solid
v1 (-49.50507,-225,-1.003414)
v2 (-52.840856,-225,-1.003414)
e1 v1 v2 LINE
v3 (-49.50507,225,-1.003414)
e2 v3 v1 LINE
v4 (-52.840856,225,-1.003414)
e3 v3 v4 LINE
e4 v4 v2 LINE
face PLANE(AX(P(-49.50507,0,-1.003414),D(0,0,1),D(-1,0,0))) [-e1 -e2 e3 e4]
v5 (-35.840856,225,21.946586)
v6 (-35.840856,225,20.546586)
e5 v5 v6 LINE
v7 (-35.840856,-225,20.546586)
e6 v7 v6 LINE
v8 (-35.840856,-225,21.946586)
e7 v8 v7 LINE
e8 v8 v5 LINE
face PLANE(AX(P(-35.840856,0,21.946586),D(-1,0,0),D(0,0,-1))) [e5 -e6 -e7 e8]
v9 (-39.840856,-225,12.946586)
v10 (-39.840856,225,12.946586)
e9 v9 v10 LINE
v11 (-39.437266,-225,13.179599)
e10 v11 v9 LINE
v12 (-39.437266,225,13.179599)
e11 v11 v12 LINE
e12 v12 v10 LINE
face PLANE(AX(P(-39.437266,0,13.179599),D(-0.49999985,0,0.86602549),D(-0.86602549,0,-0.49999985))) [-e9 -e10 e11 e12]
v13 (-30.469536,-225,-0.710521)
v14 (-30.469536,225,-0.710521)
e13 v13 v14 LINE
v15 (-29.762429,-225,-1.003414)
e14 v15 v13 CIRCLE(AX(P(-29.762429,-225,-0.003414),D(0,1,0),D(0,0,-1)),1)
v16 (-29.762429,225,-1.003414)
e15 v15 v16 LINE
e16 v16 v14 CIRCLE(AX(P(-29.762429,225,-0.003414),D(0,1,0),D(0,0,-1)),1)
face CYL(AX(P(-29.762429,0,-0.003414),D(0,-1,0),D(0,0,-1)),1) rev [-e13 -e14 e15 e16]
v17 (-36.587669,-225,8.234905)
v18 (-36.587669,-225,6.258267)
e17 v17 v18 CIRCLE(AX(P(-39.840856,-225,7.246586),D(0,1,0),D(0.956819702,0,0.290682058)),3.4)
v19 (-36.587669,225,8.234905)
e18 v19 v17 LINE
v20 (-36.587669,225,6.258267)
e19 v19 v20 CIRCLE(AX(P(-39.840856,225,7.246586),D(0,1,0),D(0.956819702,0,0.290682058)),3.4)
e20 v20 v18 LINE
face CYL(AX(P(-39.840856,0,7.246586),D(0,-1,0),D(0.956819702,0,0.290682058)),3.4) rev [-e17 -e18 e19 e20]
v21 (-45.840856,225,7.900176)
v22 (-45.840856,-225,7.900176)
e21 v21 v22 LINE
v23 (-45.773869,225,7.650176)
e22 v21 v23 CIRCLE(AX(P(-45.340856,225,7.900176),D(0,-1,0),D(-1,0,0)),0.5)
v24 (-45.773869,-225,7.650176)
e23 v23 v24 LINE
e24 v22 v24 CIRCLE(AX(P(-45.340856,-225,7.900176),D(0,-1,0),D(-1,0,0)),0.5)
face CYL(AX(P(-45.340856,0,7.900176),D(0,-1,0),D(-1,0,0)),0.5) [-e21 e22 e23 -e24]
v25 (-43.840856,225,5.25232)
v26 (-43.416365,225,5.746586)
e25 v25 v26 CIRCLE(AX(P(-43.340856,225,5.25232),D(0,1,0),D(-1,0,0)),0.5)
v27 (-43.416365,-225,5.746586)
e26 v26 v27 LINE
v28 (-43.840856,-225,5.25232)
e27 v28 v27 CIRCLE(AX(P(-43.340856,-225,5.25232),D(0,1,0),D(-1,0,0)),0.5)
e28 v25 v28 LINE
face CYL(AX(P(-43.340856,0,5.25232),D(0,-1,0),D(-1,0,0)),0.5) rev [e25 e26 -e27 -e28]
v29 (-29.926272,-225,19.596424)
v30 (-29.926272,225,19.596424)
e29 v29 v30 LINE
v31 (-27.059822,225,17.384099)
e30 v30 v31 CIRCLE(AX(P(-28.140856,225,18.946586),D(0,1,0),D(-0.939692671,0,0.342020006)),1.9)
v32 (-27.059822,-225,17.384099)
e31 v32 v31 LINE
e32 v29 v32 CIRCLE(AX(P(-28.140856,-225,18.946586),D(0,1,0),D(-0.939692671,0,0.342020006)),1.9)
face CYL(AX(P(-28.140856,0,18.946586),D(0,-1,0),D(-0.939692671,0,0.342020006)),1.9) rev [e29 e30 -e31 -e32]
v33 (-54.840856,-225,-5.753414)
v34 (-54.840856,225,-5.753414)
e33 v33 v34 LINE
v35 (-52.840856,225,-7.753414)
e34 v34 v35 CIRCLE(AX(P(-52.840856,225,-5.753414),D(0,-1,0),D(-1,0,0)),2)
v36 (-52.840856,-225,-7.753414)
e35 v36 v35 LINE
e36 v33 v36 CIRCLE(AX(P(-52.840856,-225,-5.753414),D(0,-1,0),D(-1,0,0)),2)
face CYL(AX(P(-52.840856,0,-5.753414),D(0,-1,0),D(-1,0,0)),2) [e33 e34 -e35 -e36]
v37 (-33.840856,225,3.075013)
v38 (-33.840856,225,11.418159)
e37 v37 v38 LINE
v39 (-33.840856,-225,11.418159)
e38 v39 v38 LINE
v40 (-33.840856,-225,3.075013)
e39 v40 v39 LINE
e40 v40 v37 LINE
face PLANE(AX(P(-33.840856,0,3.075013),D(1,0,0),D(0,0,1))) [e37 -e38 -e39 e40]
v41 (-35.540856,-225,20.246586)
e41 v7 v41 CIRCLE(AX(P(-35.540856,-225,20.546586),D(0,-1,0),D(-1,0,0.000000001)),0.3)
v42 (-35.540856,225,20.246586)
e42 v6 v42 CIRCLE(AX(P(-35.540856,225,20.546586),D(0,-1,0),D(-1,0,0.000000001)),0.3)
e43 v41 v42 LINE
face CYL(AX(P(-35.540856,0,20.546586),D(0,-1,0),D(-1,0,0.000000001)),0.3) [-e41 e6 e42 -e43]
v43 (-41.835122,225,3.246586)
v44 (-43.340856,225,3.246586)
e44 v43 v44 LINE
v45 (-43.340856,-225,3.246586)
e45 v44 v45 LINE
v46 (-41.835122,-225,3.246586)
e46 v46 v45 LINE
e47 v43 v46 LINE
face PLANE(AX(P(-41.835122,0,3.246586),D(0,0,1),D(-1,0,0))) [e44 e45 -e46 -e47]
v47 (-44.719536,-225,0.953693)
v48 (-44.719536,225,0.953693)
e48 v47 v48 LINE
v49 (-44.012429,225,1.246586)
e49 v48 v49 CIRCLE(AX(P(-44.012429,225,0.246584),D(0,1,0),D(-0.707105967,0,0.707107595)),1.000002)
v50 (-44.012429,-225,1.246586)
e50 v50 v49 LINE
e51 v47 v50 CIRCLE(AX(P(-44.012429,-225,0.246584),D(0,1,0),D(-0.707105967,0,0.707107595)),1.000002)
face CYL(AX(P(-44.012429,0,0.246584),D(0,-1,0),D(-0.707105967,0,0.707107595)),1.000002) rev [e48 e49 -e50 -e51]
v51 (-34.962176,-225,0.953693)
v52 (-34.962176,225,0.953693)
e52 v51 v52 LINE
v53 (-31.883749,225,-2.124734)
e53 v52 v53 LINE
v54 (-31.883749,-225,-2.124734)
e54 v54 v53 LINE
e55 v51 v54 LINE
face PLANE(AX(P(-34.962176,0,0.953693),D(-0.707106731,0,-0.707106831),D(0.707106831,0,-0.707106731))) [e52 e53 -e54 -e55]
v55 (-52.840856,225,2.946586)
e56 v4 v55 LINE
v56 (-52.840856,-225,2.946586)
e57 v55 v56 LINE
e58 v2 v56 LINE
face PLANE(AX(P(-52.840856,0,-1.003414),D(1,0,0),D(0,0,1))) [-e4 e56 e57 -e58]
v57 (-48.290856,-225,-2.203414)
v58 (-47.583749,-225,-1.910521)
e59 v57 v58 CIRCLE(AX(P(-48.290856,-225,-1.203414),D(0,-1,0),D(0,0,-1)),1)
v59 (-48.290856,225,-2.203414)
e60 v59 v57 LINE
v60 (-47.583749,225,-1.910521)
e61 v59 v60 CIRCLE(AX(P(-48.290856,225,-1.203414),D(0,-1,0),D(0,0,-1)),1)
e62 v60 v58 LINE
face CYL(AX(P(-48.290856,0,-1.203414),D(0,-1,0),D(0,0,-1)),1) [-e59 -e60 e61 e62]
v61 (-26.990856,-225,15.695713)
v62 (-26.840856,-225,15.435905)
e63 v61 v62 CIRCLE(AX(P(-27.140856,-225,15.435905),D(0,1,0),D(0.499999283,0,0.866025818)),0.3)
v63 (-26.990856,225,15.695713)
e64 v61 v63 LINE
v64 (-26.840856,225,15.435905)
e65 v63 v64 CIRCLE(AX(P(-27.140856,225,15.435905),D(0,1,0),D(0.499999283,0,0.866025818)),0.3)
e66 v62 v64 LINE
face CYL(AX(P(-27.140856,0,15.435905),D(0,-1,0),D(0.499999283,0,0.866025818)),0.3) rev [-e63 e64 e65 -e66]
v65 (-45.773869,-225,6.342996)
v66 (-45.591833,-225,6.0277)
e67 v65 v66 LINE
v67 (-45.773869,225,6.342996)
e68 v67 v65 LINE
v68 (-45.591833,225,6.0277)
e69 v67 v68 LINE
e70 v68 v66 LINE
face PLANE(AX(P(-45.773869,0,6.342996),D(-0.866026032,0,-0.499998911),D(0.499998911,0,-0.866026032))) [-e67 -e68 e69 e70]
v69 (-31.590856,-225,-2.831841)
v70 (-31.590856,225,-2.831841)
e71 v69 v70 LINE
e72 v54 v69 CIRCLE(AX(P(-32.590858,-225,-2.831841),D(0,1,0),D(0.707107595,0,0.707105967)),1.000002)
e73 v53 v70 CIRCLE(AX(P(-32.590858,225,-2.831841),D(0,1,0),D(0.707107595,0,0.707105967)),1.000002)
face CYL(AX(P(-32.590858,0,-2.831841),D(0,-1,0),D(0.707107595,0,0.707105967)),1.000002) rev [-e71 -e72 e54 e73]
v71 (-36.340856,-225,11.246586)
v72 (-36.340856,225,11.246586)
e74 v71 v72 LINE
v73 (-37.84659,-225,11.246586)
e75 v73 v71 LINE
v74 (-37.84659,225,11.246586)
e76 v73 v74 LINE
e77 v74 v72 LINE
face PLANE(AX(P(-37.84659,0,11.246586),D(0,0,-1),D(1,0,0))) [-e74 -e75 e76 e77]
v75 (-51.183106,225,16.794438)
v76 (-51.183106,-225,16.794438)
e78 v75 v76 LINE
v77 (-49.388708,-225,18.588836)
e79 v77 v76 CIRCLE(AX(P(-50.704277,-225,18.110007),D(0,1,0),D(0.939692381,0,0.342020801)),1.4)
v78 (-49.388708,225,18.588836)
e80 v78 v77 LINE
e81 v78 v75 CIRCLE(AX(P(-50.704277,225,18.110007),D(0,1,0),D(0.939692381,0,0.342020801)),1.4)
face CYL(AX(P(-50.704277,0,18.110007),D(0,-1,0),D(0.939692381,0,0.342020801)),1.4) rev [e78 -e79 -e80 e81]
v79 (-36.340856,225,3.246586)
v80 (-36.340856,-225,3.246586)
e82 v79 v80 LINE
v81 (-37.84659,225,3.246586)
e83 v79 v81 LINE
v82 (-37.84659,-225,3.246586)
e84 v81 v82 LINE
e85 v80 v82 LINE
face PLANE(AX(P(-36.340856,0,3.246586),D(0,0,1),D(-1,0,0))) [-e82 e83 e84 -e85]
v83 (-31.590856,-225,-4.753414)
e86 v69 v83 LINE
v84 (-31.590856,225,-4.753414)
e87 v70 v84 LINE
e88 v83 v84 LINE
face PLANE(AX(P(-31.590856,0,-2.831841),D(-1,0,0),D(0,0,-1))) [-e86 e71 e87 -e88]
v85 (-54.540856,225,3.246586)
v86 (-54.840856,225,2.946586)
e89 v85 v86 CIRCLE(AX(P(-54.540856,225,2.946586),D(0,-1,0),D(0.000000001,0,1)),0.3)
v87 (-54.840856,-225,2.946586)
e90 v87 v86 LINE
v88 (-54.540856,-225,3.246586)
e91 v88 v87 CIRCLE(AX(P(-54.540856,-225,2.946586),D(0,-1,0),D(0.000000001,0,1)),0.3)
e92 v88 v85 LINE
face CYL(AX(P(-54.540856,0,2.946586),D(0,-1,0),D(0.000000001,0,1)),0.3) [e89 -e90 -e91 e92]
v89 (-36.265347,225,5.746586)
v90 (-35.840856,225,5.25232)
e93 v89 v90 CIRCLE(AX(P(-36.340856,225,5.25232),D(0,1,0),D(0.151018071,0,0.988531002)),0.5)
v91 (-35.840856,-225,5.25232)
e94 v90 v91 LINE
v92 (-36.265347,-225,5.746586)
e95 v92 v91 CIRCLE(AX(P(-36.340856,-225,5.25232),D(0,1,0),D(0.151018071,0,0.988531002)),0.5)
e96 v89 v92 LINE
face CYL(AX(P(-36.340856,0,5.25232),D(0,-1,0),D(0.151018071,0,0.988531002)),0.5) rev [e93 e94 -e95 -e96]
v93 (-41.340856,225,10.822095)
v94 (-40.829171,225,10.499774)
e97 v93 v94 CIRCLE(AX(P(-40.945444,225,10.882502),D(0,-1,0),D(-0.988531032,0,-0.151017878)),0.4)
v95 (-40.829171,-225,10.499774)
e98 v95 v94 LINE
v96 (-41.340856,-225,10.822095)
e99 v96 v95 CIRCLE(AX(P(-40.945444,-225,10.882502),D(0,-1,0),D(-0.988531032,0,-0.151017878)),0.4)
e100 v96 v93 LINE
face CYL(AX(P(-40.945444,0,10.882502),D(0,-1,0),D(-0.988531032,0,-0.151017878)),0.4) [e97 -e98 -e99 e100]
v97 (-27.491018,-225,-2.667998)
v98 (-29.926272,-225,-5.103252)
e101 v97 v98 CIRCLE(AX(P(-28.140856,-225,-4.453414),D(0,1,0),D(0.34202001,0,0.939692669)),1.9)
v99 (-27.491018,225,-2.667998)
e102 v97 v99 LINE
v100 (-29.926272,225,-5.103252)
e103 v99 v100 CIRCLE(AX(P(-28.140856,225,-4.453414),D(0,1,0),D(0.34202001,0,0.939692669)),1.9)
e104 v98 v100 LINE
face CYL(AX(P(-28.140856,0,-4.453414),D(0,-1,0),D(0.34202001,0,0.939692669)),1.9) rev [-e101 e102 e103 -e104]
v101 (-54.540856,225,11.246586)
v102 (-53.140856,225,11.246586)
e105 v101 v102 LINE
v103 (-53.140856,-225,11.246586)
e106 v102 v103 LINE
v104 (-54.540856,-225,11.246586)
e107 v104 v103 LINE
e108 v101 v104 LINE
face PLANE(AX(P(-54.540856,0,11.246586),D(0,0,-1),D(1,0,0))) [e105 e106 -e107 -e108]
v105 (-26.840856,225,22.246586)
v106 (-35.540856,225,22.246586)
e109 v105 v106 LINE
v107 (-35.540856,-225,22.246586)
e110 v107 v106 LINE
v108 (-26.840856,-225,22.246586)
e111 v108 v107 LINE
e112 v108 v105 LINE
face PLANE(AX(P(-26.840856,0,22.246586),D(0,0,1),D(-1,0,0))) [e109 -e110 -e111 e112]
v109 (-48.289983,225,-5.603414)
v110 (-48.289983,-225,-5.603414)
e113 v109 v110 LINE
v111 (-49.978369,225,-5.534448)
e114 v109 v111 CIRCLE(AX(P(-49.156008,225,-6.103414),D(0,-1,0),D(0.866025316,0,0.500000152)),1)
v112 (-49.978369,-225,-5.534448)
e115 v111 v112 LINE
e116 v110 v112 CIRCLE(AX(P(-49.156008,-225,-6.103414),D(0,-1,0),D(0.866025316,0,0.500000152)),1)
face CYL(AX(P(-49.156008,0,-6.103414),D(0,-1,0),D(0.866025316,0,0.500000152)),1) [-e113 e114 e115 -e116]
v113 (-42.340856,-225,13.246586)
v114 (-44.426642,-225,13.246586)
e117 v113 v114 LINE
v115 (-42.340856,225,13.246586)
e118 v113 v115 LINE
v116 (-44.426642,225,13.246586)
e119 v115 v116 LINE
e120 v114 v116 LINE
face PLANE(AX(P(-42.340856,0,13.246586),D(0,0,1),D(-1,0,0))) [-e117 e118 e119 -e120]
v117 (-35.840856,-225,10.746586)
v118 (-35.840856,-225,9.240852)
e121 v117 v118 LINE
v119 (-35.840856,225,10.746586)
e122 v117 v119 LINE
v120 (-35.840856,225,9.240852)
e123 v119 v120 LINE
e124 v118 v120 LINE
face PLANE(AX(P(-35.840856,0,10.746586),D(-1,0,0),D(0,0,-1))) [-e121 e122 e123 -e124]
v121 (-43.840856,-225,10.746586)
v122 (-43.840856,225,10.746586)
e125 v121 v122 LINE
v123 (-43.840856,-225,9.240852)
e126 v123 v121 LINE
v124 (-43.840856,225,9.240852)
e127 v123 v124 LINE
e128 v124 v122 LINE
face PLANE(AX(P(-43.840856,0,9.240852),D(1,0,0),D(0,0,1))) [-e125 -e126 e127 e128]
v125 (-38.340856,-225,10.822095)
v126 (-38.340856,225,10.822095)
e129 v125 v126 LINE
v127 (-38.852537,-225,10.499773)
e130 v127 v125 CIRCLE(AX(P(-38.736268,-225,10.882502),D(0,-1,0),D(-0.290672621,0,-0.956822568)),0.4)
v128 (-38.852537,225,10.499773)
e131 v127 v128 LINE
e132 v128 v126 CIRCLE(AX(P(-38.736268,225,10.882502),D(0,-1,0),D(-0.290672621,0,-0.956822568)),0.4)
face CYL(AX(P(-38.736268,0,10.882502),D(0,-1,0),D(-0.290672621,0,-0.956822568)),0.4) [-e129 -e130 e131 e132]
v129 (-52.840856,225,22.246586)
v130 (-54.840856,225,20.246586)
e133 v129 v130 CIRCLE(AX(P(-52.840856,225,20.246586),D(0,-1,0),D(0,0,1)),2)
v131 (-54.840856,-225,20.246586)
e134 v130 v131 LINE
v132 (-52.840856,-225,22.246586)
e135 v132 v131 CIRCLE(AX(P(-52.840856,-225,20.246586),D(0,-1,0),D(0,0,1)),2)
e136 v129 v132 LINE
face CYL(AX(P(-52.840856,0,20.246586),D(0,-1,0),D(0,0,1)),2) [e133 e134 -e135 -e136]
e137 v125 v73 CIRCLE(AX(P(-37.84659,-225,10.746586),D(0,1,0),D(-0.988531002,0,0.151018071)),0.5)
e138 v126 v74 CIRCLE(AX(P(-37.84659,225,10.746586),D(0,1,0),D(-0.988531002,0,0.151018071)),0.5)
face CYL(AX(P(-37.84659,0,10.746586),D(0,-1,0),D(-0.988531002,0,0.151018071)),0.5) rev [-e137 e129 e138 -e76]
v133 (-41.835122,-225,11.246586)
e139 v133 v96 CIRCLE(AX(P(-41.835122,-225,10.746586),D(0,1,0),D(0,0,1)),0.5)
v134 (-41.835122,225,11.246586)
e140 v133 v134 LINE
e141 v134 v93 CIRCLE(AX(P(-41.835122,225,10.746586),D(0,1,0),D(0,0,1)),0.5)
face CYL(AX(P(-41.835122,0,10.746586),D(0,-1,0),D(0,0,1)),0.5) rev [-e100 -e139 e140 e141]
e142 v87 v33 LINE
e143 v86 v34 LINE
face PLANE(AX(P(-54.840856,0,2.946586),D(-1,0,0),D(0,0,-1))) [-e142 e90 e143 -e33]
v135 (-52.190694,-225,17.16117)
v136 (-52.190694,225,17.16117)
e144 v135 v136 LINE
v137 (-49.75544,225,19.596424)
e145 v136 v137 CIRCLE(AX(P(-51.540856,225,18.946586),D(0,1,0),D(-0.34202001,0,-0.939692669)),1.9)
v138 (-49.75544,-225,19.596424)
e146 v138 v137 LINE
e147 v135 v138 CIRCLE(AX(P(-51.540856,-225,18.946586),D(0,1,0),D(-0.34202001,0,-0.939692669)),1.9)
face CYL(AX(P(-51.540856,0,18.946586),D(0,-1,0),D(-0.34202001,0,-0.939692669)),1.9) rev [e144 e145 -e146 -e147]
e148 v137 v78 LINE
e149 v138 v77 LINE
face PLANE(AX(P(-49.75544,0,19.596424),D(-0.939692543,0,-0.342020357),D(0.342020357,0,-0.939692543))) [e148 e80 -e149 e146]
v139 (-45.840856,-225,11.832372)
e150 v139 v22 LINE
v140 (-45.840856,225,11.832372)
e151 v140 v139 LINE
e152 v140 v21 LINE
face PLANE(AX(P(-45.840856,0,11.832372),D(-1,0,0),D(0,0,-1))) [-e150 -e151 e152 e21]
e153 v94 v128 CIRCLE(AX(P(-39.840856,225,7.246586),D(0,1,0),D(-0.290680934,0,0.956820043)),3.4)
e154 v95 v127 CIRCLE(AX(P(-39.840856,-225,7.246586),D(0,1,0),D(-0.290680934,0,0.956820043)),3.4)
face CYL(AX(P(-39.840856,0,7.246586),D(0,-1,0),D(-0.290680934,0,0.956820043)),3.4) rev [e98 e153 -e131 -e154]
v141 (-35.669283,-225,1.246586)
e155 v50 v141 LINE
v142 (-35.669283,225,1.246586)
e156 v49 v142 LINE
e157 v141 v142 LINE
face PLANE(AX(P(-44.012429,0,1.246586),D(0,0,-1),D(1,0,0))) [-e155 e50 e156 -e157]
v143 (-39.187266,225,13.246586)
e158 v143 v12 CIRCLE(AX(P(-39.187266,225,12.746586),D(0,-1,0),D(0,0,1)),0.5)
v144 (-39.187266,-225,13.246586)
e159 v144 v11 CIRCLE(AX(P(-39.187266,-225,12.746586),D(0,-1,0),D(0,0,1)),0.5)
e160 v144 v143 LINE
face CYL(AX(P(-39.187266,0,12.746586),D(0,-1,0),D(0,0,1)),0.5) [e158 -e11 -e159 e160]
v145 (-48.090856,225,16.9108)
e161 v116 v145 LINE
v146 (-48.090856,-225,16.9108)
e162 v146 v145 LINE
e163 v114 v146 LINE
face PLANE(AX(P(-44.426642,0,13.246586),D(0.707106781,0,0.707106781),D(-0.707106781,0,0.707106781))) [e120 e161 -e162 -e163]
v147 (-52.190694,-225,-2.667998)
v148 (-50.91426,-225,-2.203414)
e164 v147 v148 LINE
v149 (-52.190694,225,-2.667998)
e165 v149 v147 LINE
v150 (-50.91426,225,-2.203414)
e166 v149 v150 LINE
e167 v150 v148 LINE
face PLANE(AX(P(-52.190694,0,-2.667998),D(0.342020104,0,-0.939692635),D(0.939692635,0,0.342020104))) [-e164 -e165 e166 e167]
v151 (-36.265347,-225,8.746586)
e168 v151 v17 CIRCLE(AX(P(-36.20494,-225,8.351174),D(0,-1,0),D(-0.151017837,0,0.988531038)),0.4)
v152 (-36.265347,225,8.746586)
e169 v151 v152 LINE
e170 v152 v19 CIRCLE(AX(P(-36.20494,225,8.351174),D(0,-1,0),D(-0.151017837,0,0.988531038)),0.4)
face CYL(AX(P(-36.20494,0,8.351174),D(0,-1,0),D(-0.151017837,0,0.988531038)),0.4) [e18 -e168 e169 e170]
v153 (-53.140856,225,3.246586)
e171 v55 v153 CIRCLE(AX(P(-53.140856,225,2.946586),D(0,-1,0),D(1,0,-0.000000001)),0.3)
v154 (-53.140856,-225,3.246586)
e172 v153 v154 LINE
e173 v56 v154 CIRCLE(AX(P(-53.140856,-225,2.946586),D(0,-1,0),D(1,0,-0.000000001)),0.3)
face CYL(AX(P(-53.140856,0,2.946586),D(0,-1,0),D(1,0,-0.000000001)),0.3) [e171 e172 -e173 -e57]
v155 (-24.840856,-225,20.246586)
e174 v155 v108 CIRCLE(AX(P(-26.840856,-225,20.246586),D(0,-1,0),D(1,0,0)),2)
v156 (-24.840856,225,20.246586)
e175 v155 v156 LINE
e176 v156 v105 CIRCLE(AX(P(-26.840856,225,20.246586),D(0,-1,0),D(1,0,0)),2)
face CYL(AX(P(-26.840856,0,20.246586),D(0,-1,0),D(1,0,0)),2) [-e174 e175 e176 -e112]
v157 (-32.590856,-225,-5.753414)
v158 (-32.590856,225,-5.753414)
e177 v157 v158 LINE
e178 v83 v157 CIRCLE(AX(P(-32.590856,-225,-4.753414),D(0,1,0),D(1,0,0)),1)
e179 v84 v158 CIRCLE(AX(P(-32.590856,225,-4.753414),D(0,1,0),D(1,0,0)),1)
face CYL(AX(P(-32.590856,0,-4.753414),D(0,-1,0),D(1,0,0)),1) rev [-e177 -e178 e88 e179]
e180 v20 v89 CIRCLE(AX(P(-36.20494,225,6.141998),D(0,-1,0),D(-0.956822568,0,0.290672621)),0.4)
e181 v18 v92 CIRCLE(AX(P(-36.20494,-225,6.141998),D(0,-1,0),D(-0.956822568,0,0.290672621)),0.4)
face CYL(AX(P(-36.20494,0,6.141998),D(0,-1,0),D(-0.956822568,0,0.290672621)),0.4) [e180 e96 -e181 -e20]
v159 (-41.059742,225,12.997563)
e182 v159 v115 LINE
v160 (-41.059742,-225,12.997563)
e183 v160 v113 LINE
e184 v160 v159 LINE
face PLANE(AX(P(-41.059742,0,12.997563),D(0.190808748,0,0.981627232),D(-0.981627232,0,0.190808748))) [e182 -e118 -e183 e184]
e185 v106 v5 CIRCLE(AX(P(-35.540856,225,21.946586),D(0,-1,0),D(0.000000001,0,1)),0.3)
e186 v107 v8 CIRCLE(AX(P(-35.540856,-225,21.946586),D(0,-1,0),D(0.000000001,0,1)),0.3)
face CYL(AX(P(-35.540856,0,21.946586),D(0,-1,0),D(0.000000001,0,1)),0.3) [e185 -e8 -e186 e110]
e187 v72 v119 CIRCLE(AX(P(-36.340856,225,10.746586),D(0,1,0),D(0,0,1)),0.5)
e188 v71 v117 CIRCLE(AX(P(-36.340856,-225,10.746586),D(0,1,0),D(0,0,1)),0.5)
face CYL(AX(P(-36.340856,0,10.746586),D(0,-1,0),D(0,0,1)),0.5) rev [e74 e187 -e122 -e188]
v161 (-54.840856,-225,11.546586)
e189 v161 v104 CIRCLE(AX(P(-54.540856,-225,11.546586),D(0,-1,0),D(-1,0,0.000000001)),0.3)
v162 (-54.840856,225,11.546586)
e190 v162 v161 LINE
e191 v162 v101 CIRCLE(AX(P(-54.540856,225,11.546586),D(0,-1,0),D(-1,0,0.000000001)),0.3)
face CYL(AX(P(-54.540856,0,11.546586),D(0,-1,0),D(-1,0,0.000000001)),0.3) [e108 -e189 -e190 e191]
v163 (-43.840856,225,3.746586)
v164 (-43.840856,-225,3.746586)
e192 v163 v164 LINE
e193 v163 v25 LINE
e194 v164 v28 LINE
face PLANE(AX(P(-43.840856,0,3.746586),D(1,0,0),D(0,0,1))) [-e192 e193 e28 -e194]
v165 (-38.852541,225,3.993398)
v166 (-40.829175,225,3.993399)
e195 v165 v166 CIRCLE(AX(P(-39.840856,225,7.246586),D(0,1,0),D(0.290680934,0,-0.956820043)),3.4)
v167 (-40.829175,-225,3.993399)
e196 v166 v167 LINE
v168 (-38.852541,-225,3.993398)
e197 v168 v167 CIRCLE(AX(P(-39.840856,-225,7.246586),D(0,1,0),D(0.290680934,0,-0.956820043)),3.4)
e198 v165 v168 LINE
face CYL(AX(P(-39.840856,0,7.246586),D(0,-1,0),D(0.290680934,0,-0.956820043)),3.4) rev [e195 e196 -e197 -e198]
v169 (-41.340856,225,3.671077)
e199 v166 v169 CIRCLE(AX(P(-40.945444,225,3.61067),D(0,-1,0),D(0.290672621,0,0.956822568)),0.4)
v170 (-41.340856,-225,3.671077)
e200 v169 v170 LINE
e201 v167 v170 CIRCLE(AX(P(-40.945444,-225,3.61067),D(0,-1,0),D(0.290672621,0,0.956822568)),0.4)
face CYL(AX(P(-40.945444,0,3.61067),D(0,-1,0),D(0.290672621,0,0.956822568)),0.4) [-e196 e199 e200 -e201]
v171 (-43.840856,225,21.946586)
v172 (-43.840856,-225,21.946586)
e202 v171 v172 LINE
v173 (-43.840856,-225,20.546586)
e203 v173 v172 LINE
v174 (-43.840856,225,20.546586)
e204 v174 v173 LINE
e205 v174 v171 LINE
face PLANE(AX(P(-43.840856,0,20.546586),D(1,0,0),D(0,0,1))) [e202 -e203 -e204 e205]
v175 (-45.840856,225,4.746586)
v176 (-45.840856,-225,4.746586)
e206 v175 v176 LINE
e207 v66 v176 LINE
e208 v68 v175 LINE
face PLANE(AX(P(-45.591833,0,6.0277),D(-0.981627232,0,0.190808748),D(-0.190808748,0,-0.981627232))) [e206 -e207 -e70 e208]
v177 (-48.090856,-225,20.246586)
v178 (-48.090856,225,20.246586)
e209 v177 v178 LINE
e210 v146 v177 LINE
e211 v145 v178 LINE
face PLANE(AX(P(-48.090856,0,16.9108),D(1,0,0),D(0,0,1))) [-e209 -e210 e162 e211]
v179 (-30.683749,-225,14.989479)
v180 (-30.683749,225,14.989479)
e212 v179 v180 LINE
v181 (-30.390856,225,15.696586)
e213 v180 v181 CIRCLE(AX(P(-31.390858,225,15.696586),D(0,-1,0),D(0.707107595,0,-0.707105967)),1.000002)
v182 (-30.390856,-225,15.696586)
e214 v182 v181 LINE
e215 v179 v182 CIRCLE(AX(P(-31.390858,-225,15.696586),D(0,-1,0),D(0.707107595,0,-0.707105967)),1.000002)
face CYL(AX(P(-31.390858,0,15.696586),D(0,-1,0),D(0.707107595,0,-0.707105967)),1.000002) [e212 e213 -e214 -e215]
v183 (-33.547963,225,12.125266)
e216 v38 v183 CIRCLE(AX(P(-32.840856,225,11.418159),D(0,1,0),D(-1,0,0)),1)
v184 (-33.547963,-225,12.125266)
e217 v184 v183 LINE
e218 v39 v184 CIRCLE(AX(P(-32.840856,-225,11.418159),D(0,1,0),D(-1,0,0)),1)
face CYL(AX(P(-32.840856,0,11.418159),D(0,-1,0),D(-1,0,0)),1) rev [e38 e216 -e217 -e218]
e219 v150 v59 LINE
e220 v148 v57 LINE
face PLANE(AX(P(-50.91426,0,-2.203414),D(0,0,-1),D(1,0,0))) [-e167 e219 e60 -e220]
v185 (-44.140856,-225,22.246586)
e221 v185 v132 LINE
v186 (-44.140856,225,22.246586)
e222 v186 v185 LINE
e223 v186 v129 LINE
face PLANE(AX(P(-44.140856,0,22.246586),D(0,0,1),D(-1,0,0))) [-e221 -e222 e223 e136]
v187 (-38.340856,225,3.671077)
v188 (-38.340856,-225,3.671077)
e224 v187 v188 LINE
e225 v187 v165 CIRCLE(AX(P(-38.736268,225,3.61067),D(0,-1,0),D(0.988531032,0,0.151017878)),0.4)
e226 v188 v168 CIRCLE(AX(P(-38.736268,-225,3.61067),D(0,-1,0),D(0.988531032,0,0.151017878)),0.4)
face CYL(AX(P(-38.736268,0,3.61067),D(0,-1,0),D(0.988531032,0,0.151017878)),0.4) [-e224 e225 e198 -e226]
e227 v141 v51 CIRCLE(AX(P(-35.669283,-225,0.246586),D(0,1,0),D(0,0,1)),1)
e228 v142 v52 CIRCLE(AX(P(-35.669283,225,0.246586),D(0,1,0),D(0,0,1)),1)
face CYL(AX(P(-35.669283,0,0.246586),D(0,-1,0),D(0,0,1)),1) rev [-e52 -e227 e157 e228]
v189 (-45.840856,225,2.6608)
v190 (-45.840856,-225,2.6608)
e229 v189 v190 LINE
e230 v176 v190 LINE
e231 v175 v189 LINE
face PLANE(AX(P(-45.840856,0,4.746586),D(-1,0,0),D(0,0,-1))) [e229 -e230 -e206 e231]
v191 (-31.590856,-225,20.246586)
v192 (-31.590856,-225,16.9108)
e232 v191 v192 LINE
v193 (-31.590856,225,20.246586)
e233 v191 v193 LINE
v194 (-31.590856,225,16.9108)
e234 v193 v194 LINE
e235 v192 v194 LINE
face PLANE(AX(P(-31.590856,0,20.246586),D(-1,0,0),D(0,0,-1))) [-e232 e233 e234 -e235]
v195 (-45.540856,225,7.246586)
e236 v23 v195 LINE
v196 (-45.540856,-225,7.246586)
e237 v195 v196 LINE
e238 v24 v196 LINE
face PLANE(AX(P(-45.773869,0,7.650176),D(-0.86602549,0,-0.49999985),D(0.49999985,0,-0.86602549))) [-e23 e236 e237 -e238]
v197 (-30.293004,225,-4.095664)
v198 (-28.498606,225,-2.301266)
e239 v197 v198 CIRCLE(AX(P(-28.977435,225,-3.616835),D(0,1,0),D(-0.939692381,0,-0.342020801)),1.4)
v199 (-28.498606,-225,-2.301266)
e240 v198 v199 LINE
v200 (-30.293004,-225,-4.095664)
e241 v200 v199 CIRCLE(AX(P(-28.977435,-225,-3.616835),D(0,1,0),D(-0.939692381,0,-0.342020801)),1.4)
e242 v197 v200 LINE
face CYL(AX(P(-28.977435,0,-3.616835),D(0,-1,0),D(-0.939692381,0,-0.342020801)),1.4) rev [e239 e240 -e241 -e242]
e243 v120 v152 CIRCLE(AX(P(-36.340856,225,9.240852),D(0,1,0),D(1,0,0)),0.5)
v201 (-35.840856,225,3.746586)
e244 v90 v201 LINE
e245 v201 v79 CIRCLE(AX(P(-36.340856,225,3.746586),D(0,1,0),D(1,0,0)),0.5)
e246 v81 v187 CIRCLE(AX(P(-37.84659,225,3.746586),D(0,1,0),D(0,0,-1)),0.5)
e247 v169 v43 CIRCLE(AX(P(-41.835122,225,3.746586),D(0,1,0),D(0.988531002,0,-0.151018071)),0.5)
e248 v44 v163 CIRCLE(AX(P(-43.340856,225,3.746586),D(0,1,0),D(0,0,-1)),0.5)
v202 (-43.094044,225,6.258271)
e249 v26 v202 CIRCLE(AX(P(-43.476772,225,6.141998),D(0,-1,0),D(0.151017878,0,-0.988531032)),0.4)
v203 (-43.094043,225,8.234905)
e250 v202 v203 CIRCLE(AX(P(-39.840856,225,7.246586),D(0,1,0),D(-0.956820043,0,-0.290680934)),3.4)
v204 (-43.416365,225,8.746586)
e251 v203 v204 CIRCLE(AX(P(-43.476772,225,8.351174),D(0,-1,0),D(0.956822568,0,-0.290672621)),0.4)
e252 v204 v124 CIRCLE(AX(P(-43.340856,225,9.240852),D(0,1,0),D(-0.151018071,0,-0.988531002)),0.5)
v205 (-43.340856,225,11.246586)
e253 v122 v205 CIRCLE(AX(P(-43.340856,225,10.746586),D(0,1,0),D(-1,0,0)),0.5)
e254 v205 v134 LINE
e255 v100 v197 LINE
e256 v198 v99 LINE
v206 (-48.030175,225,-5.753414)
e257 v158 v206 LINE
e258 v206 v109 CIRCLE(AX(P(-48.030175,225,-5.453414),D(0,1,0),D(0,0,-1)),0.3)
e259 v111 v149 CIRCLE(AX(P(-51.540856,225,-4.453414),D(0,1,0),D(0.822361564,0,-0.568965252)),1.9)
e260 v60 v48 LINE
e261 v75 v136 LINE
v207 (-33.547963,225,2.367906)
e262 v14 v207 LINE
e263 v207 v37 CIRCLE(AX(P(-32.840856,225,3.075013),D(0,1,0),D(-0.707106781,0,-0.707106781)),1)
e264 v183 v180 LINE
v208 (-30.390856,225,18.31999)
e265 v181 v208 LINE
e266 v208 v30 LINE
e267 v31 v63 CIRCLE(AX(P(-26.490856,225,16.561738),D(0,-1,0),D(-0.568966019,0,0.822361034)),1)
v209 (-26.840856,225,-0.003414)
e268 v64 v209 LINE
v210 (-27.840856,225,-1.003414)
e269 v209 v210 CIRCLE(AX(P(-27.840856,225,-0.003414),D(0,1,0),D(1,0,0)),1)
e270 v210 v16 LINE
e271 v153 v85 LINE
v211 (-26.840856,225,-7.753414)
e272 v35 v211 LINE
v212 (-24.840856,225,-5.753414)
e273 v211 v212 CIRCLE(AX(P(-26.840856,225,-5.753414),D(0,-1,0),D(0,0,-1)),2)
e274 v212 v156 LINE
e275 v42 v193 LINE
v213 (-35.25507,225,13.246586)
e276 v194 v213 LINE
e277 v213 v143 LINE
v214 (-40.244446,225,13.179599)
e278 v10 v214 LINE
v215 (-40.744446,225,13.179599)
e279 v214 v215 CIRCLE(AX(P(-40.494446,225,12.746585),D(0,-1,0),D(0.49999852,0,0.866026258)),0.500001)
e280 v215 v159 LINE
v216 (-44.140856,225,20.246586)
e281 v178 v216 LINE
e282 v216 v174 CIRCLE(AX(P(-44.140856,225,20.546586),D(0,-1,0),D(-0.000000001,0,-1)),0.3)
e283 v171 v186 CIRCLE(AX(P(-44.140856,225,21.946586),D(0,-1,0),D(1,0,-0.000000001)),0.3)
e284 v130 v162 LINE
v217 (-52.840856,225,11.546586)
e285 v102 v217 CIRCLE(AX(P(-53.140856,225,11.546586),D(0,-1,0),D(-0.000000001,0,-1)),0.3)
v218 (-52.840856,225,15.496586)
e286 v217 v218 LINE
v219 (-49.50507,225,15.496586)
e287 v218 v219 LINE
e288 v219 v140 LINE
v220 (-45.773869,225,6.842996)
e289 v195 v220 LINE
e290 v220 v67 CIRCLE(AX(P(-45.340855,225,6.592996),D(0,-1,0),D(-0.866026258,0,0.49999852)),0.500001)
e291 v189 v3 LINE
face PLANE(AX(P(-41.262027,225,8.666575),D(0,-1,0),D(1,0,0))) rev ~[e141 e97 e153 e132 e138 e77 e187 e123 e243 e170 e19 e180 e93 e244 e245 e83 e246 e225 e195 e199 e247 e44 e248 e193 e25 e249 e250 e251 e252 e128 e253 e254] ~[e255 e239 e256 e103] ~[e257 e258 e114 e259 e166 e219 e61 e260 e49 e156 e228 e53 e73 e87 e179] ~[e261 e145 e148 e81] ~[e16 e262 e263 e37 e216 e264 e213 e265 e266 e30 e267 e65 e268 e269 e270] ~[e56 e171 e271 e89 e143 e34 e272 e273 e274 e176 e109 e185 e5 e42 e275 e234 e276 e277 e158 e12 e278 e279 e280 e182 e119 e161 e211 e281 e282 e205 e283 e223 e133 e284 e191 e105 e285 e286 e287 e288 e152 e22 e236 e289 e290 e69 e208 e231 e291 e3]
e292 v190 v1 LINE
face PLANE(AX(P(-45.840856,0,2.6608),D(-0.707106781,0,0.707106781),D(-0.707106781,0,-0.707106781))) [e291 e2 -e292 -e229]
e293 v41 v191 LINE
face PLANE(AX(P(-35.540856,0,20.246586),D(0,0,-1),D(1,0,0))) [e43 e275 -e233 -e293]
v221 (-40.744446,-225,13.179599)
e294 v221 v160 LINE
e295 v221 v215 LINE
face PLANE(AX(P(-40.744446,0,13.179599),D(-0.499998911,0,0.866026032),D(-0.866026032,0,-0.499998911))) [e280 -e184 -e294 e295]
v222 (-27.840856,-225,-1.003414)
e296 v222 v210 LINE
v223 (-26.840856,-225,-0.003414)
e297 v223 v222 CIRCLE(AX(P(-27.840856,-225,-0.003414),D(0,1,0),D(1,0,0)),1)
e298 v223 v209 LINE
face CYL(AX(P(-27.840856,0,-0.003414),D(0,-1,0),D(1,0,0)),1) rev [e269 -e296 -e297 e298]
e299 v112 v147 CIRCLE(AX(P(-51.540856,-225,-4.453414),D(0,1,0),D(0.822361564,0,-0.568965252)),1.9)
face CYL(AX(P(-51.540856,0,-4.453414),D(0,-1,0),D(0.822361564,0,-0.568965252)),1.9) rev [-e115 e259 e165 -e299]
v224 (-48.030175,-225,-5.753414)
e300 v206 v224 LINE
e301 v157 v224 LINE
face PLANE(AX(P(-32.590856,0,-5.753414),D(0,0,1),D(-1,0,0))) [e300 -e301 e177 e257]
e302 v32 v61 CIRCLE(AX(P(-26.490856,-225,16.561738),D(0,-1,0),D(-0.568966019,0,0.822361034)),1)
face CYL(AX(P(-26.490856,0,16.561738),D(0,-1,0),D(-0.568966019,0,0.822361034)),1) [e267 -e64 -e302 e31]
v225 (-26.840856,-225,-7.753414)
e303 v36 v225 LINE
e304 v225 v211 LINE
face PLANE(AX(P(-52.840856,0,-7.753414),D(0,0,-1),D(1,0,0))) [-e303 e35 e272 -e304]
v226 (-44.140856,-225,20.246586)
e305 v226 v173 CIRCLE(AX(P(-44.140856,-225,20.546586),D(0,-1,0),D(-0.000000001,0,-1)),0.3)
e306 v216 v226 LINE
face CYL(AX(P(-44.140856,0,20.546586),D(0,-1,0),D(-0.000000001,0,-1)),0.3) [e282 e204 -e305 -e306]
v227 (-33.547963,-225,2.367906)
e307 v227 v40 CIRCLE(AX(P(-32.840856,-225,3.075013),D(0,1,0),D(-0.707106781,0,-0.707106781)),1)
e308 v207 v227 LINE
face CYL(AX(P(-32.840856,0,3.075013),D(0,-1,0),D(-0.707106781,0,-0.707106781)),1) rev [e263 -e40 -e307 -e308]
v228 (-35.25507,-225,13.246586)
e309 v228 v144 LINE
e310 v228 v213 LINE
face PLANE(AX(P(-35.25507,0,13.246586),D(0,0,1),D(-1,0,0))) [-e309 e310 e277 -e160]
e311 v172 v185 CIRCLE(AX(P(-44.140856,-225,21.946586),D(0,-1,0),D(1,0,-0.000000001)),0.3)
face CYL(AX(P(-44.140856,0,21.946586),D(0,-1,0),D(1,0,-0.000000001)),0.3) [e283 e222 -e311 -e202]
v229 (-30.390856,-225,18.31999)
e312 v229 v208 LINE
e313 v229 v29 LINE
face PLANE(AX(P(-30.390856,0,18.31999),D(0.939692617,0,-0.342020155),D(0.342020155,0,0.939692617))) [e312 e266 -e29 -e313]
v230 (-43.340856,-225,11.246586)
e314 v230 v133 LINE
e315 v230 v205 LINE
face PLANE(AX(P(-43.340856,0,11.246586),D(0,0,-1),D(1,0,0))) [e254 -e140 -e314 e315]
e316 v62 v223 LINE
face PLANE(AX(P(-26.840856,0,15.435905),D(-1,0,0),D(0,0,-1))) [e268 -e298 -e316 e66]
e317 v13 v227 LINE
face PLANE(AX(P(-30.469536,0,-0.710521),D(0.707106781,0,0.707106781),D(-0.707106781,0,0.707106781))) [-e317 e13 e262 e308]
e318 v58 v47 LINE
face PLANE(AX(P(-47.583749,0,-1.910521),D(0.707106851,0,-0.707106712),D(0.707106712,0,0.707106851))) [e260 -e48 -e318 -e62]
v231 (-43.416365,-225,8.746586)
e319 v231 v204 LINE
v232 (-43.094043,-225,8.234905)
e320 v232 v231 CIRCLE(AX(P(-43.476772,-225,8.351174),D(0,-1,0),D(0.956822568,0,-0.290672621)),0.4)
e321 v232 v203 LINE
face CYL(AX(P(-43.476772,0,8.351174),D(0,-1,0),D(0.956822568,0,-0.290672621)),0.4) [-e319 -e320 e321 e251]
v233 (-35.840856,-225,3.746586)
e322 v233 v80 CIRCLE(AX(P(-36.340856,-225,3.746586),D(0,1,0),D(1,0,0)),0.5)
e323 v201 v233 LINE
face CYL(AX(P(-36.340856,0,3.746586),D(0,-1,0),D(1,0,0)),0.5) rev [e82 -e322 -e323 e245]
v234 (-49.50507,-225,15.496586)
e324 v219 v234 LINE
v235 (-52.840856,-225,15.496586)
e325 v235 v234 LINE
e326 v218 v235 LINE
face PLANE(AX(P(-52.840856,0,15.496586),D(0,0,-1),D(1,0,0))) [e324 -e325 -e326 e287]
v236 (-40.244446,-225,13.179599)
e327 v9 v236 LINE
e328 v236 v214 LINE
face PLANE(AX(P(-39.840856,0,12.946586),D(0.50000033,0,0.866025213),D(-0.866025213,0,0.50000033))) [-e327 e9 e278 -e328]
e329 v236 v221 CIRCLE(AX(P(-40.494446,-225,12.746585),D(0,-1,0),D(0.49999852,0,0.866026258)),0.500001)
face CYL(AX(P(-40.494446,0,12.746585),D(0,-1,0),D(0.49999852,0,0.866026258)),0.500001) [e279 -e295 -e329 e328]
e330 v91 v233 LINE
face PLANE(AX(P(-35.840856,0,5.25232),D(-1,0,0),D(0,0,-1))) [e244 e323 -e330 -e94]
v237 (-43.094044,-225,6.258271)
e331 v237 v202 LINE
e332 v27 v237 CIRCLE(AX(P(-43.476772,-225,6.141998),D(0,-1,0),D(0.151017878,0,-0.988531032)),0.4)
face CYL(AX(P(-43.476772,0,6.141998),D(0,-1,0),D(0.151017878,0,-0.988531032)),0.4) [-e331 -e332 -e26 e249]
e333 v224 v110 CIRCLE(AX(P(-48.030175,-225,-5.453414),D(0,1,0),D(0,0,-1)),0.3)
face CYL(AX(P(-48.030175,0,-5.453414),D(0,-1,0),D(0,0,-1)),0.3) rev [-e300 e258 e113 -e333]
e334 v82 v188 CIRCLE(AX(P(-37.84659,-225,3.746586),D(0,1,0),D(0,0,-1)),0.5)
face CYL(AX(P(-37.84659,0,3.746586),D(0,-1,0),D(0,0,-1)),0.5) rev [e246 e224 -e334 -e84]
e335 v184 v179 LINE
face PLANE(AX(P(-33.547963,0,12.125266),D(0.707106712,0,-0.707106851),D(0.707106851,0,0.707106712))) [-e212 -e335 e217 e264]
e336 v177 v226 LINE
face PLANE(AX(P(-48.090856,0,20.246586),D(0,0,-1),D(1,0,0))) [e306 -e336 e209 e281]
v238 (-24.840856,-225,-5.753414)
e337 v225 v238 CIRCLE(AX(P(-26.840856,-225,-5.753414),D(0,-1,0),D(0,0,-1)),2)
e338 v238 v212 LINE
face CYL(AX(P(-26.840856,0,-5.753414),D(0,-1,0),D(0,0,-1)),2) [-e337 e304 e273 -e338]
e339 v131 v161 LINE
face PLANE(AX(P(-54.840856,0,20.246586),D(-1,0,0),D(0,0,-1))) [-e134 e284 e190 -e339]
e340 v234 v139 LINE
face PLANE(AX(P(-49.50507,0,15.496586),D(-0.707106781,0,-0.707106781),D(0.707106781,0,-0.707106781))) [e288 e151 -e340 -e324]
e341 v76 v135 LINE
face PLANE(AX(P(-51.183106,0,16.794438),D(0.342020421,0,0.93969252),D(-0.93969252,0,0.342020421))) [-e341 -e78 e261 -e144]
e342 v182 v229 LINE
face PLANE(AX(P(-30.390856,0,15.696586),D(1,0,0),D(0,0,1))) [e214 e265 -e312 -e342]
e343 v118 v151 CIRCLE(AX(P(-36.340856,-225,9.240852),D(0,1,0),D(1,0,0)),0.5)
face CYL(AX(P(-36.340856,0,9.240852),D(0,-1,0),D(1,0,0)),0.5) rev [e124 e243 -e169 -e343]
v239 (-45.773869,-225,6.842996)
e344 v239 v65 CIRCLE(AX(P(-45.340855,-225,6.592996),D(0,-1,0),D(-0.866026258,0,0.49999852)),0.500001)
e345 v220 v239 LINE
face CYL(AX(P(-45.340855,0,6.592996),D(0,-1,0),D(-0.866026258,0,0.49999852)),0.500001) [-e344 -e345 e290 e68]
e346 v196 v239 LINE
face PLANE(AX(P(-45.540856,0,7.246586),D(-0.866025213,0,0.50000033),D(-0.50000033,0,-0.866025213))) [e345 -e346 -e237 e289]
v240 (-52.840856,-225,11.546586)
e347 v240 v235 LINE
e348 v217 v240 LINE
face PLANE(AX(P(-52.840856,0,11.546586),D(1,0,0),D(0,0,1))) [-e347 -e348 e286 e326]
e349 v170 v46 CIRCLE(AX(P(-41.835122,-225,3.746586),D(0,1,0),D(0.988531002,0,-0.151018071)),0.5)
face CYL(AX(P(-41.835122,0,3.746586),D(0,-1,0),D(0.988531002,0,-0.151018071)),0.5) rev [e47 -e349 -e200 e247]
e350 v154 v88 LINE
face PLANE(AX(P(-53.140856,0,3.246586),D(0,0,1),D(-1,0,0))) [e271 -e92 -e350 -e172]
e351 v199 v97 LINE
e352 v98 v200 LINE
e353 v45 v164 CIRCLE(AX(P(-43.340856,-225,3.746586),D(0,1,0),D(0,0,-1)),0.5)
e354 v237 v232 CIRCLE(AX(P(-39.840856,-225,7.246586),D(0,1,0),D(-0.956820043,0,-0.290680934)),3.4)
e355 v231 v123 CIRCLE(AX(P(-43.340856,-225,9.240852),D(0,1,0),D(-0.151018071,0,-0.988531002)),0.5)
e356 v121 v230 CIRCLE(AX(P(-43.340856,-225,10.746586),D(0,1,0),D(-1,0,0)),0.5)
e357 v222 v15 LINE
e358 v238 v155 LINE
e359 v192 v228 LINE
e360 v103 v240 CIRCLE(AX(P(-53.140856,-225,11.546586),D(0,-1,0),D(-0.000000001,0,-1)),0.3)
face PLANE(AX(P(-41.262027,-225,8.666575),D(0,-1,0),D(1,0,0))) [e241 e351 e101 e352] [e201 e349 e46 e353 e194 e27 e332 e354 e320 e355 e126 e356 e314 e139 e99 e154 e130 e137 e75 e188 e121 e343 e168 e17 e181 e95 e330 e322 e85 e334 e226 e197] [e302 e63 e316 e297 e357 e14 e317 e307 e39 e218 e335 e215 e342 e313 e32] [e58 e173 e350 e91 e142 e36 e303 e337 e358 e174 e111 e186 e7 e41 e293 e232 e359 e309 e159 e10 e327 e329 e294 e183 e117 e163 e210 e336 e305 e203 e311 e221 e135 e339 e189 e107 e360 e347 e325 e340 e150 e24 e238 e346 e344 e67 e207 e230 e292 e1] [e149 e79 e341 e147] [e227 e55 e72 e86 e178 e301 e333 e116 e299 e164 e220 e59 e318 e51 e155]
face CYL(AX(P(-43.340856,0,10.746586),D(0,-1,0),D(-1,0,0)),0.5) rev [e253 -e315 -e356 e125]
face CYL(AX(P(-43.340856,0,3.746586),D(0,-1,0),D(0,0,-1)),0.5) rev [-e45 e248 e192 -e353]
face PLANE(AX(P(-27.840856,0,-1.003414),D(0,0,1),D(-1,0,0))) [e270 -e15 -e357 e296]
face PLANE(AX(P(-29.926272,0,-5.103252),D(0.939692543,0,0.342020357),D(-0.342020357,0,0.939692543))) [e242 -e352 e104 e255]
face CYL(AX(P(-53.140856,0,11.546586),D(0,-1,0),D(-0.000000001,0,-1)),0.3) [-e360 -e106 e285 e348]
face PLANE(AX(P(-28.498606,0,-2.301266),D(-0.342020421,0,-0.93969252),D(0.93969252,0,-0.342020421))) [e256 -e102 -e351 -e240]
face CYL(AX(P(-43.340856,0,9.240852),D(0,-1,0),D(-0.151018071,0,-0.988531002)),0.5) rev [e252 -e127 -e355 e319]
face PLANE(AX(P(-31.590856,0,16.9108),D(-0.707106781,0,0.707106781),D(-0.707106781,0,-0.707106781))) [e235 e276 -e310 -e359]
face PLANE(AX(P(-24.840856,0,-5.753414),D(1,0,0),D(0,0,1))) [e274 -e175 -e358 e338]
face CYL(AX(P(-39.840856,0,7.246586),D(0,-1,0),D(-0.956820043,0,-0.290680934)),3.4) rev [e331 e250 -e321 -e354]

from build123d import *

# Parameters (mm, degrees)
F2_DEPTH = 225


# Not quite as in the source:
# - ends of sketch curves that miss each other by under 0.0002 mm in the source are joined


with BuildPart() as f2:
    # F1 (on Front) → F2 (new body, symmetric)
    with BuildSketch(Plane.XZ):
        with BuildLine():
            Line((-48.090856, 20.246586), (-44.140856, 20.246586))
            ThreePointArc((-44.140856, 20.246586), (-43.9287239656, 20.3344539656), (-43.840856, 20.546586))
            Line((-43.840856, 20.546586), (-43.840856, 21.946586))
            ThreePointArc((-43.840856, 21.946586), (-43.9287239656, 22.1587180344), (-44.140856, 22.246586))
            Line((-44.140856, 22.246586), (-52.840856, 22.246586))
            ThreePointArc((-52.840856, 22.246586), (-54.2550695624, 21.6607995624), (-54.840856, 20.246586))
            Line((-54.840856, 20.246586), (-54.840856, 11.546586))
            ThreePointArc((-54.840856, 11.546586), (-54.7529880344, 11.3344539656), (-54.540856, 11.246586))
            Line((-54.540856, 11.246586), (-53.140856, 11.246586))
            ThreePointArc((-53.140856, 11.246586), (-52.9287239656, 11.3344539656), (-52.840856, 11.546586))
            Line((-52.840856, 11.546586), (-52.840856, 15.496586))
            Line((-52.840856, 15.496586), (-49.50507, 15.496586))
            Line((-49.50507, 15.496586), (-45.840856, 11.832372))
            Line((-45.840856, 11.832372), (-45.840856, 7.900176))
            ThreePointArc((-45.840856, 7.900176), (-45.8238189324, 7.7707665494), (-45.7738687764, 7.6501761291))
            Line((-45.7738687764, 7.6501761291), (-45.540856, 7.246586))
            Line((-45.540856, 7.246586), (-45.773869, 6.842996))
            ThreePointArc((-45.773869, 6.842996), (-45.840856, 6.592996), (-45.7738687764, 6.3429961291))
            Line((-45.7738687764, 6.3429961291), (-45.591833, 6.0277))
            Line((-45.591833, 6.0277), (-45.840856, 4.746586))
            Line((-45.840856, 4.746586), (-45.840856, 2.6608))
            Line((-45.840856, 2.6608), (-49.50507, -1.003414))
            Line((-49.50507, -1.003414), (-52.840856, -1.003414))
            Line((-52.840856, -1.003414), (-52.840856, 2.946586))
            ThreePointArc((-52.840856, 2.946586), (-52.9287239656, 3.1587180344), (-53.140856, 3.246586))
            Line((-53.140856, 3.246586), (-54.540856, 3.246586))
            ThreePointArc((-54.540856, 3.246586), (-54.7529880344, 3.1587180344), (-54.840856, 2.946586))
            Line((-54.840856, 2.946586), (-54.840856, -5.753414))
            ThreePointArc((-54.840856, -5.753414), (-54.2550695624, -7.1676275624), (-52.840856, -7.753414))
            Line((-52.840856, -7.753414), (-26.840856, -7.753414))
            ThreePointArc((-26.840856, -7.753414), (-25.4266424376, -7.1676275624), (-24.840856, -5.753414))
            Line((-24.840856, -5.753414), (-24.840856, 20.246586))
            ThreePointArc((-24.840856, 20.246586), (-25.4266424376, 21.6607995624), (-26.840856, 22.246586))
            Line((-26.840856, 22.246586), (-35.540856, 22.246586))
            ThreePointArc((-35.540856, 22.246586), (-35.7529880344, 22.1587180344), (-35.840856, 21.946586))
            Line((-35.840856, 21.946586), (-35.840856, 20.546586))
            ThreePointArc((-35.840856, 20.546586), (-35.7529880344, 20.3344539656), (-35.540856, 20.246586))
            Line((-35.540856, 20.246586), (-31.590856, 20.246586))
            Line((-31.590856, 20.246586), (-31.590856, 16.9108))
            Line((-31.590856, 16.9108), (-35.25507, 13.246586))
            Line((-35.25507, 13.246586), (-39.187266, 13.246586))
            ThreePointArc((-39.187266, 13.246586), (-39.3166754506, 13.2295489324), (-39.4372658709, 13.1795987764))
            Line((-39.4372658709, 13.1795987764), (-39.840856, 12.946586))
            Line((-39.840856, 12.946586), (-40.244446, 13.179599))
            ThreePointArc((-40.244446, 13.179599), (-40.494446, 13.246586), (-40.7444458709, 13.1795987764))
            Line((-40.7444458709, 13.1795987764), (-41.059742, 12.997563))
            Line((-41.059742, 12.997563), (-42.340856, 13.246586))
            Line((-42.340856, 13.246586), (-44.426642, 13.246586))
            Line((-44.426642, 13.246586), (-48.090856, 16.9108))
            Line((-48.090856, 16.9108), (-48.090856, 20.246586))
        make_face()
        with BuildLine():
            ThreePointArc((-48.030175, -5.753414), (-48.180175082, -5.7132215738), (-48.2899827159, -5.6034138359))
            ThreePointArc((-48.2899827159, -5.6034138359), (-49.1151948384, -5.1042472042), (-49.9783690315, -5.5344479782))
            ThreePointArc((-49.9783690315, -5.5344479782), (-53.0449723505, -5.6142903949), (-52.1906940253, -2.6679979306))
            Line((-52.1906940253, -2.6679979306), (-50.91426, -2.203414))
            Line((-50.91426, -2.203414), (-48.290856, -2.203414))
            ThreePointArc((-48.290856, -2.203414), (-47.9081725676, -2.1272935325), (-47.5837492188, -1.9105207812))
            Line((-47.5837492188, -1.9105207812), (-44.719536, 0.953693))
            ThreePointArc((-44.719536, 0.953693), (-44.3951124324, 1.1704655325), (-44.012429, 1.246586))
            Line((-44.012429, 1.246586), (-35.669283, 1.246586))
            ThreePointArc((-35.669283, 1.246586), (-35.2865995676, 1.1704655325), (-34.9621762188, 0.9536927812))
            Line((-34.9621762188, 0.9536927812), (-31.883749, -2.124734))
            ThreePointArc((-31.883749, -2.124734), (-31.6669764675, -2.4491575676), (-31.590856, -2.831841))
            Line((-31.590856, -2.831841), (-31.590856, -4.753414))
            ThreePointArc((-31.590856, -4.753414), (-31.8837492188, -5.4605207812), (-32.590856, -5.753414))
            Line((-32.590856, -5.753414), (-48.030175, -5.753414))
        make_face(mode=Mode.SUBTRACT)
        with BuildLine():
            ThreePointArc((-30.2930043339, -4.0956641215), (-29.9673844937, -2.6268855063), (-28.4986058785, -2.3012656661))
            Line((-28.4986058785, -2.3012656661), (-27.491018, -2.667998))
            ThreePointArc((-27.491018, -2.667998), (-26.7973531157, -5.7969168843), (-29.9262720694, -5.1032520253))
            Line((-29.9262720694, -5.1032520253), (-30.2930043339, -4.0956641215))
        make_face(mode=Mode.SUBTRACT)
        with BuildLine():
            ThreePointArc((-36.5876690145, 8.2349049956), (-36.440856, 7.246586), (-36.5876690145, 6.2582670044))
            ThreePointArc((-36.5876690145, 6.2582670044), (-36.5433888407, 5.9288023569), (-36.2653470651, 5.7465855742))
            ThreePointArc((-36.2653470651, 5.7465855742), (-35.9615444769, 5.5780848975), (-35.840856, 5.25232))
            Line((-35.840856, 5.25232), (-35.840856, 3.746586))
            ThreePointArc((-35.840856, 3.746586), (-35.9873026094, 3.3930326094), (-36.340856, 3.246586))
            Line((-36.340856, 3.246586), (-37.84659, 3.246586))
            ThreePointArc((-37.84659, 3.246586), (-38.1723548975, 3.3672744769), (-38.3408555178, 3.6710770737))
            ThreePointArc((-38.3408555178, 3.6710770737), (-38.5230723569, 3.9491188407), (-38.8525409519, 3.9933978415))
            ThreePointArc((-38.8525409519, 3.9933978415), (-39.840856, 3.846586), (-40.8291749956, 3.9933990145))
            ThreePointArc((-40.8291749956, 3.9933990145), (-41.1586396431, 3.9491188407), (-41.3408564258, 3.6710770651))
            ThreePointArc((-41.3408564258, 3.6710770651), (-41.5093571025, 3.3672744769), (-41.835122, 3.246586))
            Line((-41.835122, 3.246586), (-43.340856, 3.246586))
            ThreePointArc((-43.340856, 3.246586), (-43.6944093906, 3.3930326094), (-43.840856, 3.746586))
            Line((-43.840856, 3.746586), (-43.840856, 5.25232))
            ThreePointArc((-43.840856, 5.25232), (-43.7201675231, 5.5780848975), (-43.4163649263, 5.7465855178))
            ThreePointArc((-43.4163649263, 5.7465855178), (-43.1383231593, 5.9288023569), (-43.0940441585, 6.2582709519))
            ThreePointArc((-43.0940441585, 6.2582709519), (-43.240856, 7.246586), (-43.0940429855, 8.2349049956))
            ThreePointArc((-43.0940429855, 8.2349049956), (-43.1383231593, 8.5643696431), (-43.4163649349, 8.7465864258))
            ThreePointArc((-43.4163649349, 8.7465864258), (-43.7201675231, 8.9150871025), (-43.840856, 9.240852))
            Line((-43.840856, 9.240852), (-43.840856, 10.746586))
            ThreePointArc((-43.840856, 10.746586), (-43.6944093906, 11.1001393906), (-43.340856, 11.246586))
            Line((-43.340856, 11.246586), (-41.835122, 11.246586))
            ThreePointArc((-41.835122, 11.246586), (-41.5093571025, 11.1258975231), (-41.3408564822, 10.8220949263))
            ThreePointArc((-41.3408564822, 10.8220949263), (-41.1586396431, 10.5440531593), (-40.8291710481, 10.4997741585))
            ThreePointArc((-40.8291710481, 10.4997741585), (-39.840856, 10.646586), (-38.8525370044, 10.4997729855))
            ThreePointArc((-38.8525370044, 10.4997729855), (-38.5230723569, 10.5440531593), (-38.3408555742, 10.8220949349))
            ThreePointArc((-38.3408555742, 10.8220949349), (-38.1723548975, 11.1258975231), (-37.84659, 11.246586))
            Line((-37.84659, 11.246586), (-36.340856, 11.246586))
            ThreePointArc((-36.340856, 11.246586), (-35.9873026094, 11.1001393906), (-35.840856, 10.746586))
            Line((-35.840856, 10.746586), (-35.840856, 9.240852))
            ThreePointArc((-35.840856, 9.240852), (-35.9615444769, 8.9150871025), (-36.2653470737, 8.7465864822))
            ThreePointArc((-36.2653470737, 8.7465864822), (-36.5433888407, 8.5643696431), (-36.5876690145, 8.2349049956))
        make_face(mode=Mode.SUBTRACT)
        with BuildLine():
            ThreePointArc((-49.3887076661, 18.5888361215), (-49.7143275063, 17.1200575063), (-51.1831061215, 16.7944376661))
            Line((-51.1831061215, 16.7944376661), (-52.190694, 17.16117))
            ThreePointArc((-52.190694, 17.16117), (-52.8843588843, 20.2900888843), (-49.7554399306, 19.5964240253))
            Line((-49.7554399306, 19.5964240253), (-49.3887076661, 18.5888361215))
        make_face(mode=Mode.SUBTRACT)
        with BuildLine():
            ThreePointArc((-33.5479627812, 2.3679062188), (-33.7647355325, 2.6923295676), (-33.840856, 3.075013))
            Line((-33.840856, 3.075013), (-33.840856, 11.418159))
            ThreePointArc((-33.840856, 11.418159), (-33.7647355325, 11.8008424324), (-33.5479627812, 12.1252657812))
            Line((-33.5479627812, 12.1252657812), (-30.683749, 14.989479))
            ThreePointArc((-30.683749, 14.989479), (-30.4669764675, 15.3139025676), (-30.390856, 15.696586))
            Line((-30.390856, 15.696586), (-30.390856, 18.31999))
            Line((-30.390856, 18.31999), (-29.926272, 19.596424))
            ThreePointArc((-29.926272, 19.596424), (-26.9799796051, 20.4507023505), (-27.0598220201, 17.3840990291))
            ThreePointArc((-27.0598220201, 17.3840990291), (-27.4900227958, 16.5209248384), (-26.9908561748, 15.6957126972))
            ThreePointArc((-26.9908561748, 15.6957126972), (-26.8810484262, 15.585905082), (-26.840856, 15.435905))
            Line((-26.840856, 15.435905), (-26.840856, -0.003414))
            ThreePointArc((-26.840856, -0.003414), (-27.1337492188, -0.7105207812), (-27.840856, -1.003414))
            Line((-27.840856, -1.003414), (-29.762429, -1.003414))
            ThreePointArc((-29.762429, -1.003414), (-30.1451124324, -0.9272935325), (-30.4695357812, -0.7105207812))
            Line((-30.4695357812, -0.7105207812), (-33.5479627812, 2.3679062188))
        make_face(mode=Mode.SUBTRACT)
    extrude(amount=F2_DEPTH, both=True)


solid = f2.part
